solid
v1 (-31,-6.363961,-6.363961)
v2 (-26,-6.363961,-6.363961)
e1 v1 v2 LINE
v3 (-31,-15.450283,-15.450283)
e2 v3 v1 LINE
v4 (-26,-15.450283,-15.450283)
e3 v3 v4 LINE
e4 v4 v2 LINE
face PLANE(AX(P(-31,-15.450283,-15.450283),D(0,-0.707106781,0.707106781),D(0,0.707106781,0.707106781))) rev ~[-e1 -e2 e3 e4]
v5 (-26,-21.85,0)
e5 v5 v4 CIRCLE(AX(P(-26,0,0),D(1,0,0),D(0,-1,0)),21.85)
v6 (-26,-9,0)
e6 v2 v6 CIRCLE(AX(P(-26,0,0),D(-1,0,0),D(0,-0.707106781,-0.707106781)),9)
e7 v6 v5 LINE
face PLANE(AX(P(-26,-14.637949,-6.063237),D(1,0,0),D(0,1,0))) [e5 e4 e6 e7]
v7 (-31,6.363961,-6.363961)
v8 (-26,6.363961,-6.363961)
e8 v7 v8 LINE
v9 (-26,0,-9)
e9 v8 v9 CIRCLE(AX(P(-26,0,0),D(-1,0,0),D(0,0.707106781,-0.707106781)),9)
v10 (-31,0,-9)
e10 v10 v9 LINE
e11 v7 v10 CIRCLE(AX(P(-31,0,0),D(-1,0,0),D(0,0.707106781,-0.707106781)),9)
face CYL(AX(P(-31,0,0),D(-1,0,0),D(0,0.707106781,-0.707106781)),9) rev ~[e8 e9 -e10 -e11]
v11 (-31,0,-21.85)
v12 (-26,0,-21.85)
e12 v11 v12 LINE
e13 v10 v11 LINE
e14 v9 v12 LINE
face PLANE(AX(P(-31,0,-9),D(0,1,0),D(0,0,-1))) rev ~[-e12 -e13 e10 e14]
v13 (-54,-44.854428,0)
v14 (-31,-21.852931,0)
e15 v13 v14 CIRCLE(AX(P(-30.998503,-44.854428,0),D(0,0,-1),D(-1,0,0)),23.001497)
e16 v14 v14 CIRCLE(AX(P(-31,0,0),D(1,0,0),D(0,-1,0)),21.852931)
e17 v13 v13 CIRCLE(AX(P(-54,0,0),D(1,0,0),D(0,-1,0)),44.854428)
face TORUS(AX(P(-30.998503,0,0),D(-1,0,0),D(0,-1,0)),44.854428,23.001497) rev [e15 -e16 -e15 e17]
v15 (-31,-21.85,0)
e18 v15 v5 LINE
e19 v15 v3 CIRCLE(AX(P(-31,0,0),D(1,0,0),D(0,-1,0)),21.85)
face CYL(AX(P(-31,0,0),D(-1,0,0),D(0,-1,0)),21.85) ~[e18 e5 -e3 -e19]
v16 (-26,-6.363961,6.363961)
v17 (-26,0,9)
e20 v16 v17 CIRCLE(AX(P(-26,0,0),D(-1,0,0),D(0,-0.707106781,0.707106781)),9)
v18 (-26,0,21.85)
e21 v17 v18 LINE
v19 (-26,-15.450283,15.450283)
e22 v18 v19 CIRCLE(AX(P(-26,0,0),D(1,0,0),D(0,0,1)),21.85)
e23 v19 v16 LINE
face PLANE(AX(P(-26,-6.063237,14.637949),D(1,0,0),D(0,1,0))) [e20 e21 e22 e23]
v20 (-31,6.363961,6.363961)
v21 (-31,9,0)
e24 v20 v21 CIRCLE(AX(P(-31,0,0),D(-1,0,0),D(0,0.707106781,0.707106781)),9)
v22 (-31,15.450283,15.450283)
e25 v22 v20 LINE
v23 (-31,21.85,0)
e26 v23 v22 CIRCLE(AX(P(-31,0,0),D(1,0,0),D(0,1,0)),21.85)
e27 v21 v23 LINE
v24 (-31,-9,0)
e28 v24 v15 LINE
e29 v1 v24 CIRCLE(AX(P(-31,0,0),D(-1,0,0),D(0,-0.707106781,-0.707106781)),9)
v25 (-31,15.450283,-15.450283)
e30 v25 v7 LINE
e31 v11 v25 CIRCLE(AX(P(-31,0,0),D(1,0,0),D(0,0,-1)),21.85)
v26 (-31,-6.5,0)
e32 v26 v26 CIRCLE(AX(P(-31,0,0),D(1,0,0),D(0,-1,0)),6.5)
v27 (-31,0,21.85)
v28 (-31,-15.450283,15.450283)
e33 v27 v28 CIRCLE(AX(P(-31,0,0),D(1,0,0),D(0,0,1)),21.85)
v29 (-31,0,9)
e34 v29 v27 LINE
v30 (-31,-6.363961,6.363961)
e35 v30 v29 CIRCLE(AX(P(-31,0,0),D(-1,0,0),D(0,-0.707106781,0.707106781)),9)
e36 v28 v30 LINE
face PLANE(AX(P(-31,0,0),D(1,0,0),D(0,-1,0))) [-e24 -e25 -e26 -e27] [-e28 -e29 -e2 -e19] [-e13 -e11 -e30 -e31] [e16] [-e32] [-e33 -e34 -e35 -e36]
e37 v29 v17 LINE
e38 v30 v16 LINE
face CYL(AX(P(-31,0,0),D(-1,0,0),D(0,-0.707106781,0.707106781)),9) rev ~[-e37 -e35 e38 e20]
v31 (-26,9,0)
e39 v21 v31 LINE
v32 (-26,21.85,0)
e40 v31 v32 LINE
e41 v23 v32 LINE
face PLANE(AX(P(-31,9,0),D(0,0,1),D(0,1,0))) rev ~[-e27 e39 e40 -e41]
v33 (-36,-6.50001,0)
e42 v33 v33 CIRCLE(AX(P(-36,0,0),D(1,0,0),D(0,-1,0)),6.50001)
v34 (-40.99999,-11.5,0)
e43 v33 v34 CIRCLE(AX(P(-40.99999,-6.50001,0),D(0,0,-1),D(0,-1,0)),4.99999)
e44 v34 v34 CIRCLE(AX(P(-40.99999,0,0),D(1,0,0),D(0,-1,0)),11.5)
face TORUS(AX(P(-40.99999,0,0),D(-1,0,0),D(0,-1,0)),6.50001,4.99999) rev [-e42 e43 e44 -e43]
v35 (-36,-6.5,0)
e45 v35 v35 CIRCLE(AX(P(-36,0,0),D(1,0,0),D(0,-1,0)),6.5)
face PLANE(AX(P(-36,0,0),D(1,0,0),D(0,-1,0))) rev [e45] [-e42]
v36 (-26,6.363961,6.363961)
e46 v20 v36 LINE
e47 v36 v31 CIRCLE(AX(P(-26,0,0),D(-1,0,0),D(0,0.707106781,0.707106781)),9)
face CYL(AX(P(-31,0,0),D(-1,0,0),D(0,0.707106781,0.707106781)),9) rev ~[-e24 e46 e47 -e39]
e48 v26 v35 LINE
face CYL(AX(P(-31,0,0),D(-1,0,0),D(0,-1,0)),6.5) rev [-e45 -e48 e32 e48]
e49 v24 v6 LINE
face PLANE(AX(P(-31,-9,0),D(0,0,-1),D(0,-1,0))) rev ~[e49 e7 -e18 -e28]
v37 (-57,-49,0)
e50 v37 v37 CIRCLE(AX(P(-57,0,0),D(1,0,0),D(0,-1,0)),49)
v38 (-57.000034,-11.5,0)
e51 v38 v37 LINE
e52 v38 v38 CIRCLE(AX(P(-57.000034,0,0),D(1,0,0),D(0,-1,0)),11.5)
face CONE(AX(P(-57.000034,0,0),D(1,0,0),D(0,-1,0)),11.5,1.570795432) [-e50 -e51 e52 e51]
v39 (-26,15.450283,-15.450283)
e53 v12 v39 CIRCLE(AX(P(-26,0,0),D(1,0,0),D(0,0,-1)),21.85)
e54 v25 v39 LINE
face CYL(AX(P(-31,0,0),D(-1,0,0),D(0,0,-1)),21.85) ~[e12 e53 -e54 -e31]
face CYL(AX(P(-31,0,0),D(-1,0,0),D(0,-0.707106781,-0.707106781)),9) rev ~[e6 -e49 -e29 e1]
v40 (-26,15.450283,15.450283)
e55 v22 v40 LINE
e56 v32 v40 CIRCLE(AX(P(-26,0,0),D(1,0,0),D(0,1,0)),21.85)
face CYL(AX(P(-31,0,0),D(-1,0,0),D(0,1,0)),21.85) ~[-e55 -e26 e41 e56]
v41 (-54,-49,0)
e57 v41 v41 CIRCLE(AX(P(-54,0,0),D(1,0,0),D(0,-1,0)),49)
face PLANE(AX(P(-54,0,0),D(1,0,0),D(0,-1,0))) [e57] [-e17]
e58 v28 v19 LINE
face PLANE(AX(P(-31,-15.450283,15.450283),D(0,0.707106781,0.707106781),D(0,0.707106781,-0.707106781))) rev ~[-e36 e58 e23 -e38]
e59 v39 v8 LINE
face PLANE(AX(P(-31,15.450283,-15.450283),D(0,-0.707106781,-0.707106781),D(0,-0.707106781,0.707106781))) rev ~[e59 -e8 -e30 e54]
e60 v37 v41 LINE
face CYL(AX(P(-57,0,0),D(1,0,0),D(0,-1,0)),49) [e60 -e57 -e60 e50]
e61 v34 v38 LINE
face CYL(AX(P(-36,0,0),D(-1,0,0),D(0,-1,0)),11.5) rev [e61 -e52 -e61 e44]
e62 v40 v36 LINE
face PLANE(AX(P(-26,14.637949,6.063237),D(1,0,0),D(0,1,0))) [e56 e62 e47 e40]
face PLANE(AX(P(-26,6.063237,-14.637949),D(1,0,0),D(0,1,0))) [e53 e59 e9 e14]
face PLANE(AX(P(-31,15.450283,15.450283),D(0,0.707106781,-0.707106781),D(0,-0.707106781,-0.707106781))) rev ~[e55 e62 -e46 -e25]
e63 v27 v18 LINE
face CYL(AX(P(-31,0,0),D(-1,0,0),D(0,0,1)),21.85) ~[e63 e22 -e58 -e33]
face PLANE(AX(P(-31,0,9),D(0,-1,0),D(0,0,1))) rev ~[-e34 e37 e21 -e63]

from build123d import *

# Parameters (mm, degrees)
F3_R     = 78.8340785065
F4_DEPTH = 40
F6_DEPTH = 5
F7_R     = 4.99999


# Not quite as in the source:
# - a fillet or chamfer that OpenCascade refuses, or shapes differently, is made with other operations: its cross-section is extruded or revolved along the edge and cut away or added
# - a fillet or chamfer is up to 0.001 mm smaller than in the source, because OpenCascade refuses the exact size
# - ends of sketch curves that miss each other by under 0.0002 mm in the source are joined
# - a feature names something its author has since deleted; it is built from what else it names


with BuildPart() as f1:
    # F0 (on Top) → F1 (revolve)
    with BuildSketch(Plane.XY):
        with BuildLine():
            Line((0, -49), (0, -9))
            Line((0, -9), (-31, -9))
            Line((-31, -9), (-31, -6.5))
            Line((-31, -6.5), (-36, -6.5))
            Line((-36, -6.5), (-36, -11.5))
            Line((-36, -11.5), (-57.0000335574, -11.5))
            Line((-57.0000335574, -11.5), (-57.0000000106, -49))
            Line((-57.0000000106, -49), (-54.0000000106, -49))
            Line((-54.0000000106, -49), (-54.0000000106, -44.8544277911))
            ThreePointArc((-54.0000000106, -44.8544277911), (-47.2635467929, -28.5904424478), (-31, -21.8529305247))
            Line((-31, -21.8529305247), (-26.0000000106, -21.8529305247))
            ThreePointArc((-26.0000000106, -21.8529305247), (-9.7364532177, -28.5904424478), (-3, -44.8544277911))
            Line((-3, -44.8544277911), (-3, -49))
            Line((-3, -49), (0, -49))
        make_face()
    revolve(axis=Axis((7.519562263, 0, 0), (1, 0, 0)))

    # F2: fillet of radius 5 on 1 edges, made by hand

    # F2_s1 → F2_t2 (revolve, cut)
    with BuildSketch(Plane.XY):
        with BuildLine():
            ThreePointArc((-3.0028205283, -44.4942267471), (-2.1641233212, -47.188770834), (0, -49))
            Line((0, -49), (-0.1996566353, -49.458407273))
            ThreePointArc((-0.1996566353, -49.458407273), (-1.5, -49.5), (-3, -49.5))
            Line((-3, -49.5), (-3.5, -49))
            ThreePointArc((-3.5, -49), (-3.5, -44.8544277911), (-3.5027592164, -44.5020566949))
            Line((-3.5027592164, -44.5020566949), (-3.0028205283, -44.4942267471))
        make_face()
    revolve(axis=Axis((-3, 0, 0), (1, 0, 0)), mode=Mode.SUBTRACT)

    # F3 (on face) → F4 (cut)
    with BuildSketch(Plane.YZ.offset(-31)):
        Circle(F3_R)
    extrude(amount=F4_DEPTH, mode=Mode.SUBTRACT)

    # F5 (on face) → F6 (join)
    with BuildSketch(Plane.YZ.offset(-31)):
        with BuildLine():
            Line((9, 0), (21.85, 0))
            ThreePointArc((21.85, 0), (20.1867677854, 8.3616329972), (15.4502831689, 15.4502831689))
            Line((15.4502831689, 15.4502831689), (6.3639610307, 6.3639610307))
            ThreePointArc((6.3639610307, 6.3639610307), (8.3149157926, 3.4441508913), (9, 0))
        make_face()
        with BuildLine():
            Line((0, 9), (0, 21.85))
            ThreePointArc((0, 21.85), (-8.3616329972, 20.1867677854), (-15.4502831689, 15.4502831689))
            Line((-15.4502831689, 15.4502831689), (-6.3639610307, 6.3639610307))
            ThreePointArc((-6.3639610307, 6.3639610307), (-3.4441508913, 8.3149157926), (0, 9))
        make_face()
        with BuildLine():
            ThreePointArc((0, -21.85), (8.3616329972, -20.1867677854), (15.4502831689, -15.4502831689))
            Line((15.4502831689, -15.4502831689), (6.3639610307, -6.3639610307))
            ThreePointArc((6.3639610307, -6.3639610307), (3.4441508913, -8.3149157926), (0, -9))
            Line((0, -9), (0, -21.85))
        make_face()
        with BuildLine():
            ThreePointArc((-21.85, 0), (-20.1867677854, -8.3616329972), (-15.4502831689, -15.4502831689))
            Line((-15.4502831689, -15.4502831689), (-6.3639610307, -6.3639610307))
            ThreePointArc((-6.3639610307, -6.3639610307), (-8.3149157926, -3.4441508913), (-9, 0))
            Line((-9, 0), (-21.85, 0))
        make_face()
    extrude(amount=F6_DEPTH)

    # F7 (radius 5 in the source; OpenCascade refuses exactly that, so slightly less here)
    f7_edges = [f1.edges().sort_by_distance(p)[0] for p in [
        (-36, 11.5, 0),
    ]]
    fillet(f7_edges, radius=F7_R)


solid = f1.part
